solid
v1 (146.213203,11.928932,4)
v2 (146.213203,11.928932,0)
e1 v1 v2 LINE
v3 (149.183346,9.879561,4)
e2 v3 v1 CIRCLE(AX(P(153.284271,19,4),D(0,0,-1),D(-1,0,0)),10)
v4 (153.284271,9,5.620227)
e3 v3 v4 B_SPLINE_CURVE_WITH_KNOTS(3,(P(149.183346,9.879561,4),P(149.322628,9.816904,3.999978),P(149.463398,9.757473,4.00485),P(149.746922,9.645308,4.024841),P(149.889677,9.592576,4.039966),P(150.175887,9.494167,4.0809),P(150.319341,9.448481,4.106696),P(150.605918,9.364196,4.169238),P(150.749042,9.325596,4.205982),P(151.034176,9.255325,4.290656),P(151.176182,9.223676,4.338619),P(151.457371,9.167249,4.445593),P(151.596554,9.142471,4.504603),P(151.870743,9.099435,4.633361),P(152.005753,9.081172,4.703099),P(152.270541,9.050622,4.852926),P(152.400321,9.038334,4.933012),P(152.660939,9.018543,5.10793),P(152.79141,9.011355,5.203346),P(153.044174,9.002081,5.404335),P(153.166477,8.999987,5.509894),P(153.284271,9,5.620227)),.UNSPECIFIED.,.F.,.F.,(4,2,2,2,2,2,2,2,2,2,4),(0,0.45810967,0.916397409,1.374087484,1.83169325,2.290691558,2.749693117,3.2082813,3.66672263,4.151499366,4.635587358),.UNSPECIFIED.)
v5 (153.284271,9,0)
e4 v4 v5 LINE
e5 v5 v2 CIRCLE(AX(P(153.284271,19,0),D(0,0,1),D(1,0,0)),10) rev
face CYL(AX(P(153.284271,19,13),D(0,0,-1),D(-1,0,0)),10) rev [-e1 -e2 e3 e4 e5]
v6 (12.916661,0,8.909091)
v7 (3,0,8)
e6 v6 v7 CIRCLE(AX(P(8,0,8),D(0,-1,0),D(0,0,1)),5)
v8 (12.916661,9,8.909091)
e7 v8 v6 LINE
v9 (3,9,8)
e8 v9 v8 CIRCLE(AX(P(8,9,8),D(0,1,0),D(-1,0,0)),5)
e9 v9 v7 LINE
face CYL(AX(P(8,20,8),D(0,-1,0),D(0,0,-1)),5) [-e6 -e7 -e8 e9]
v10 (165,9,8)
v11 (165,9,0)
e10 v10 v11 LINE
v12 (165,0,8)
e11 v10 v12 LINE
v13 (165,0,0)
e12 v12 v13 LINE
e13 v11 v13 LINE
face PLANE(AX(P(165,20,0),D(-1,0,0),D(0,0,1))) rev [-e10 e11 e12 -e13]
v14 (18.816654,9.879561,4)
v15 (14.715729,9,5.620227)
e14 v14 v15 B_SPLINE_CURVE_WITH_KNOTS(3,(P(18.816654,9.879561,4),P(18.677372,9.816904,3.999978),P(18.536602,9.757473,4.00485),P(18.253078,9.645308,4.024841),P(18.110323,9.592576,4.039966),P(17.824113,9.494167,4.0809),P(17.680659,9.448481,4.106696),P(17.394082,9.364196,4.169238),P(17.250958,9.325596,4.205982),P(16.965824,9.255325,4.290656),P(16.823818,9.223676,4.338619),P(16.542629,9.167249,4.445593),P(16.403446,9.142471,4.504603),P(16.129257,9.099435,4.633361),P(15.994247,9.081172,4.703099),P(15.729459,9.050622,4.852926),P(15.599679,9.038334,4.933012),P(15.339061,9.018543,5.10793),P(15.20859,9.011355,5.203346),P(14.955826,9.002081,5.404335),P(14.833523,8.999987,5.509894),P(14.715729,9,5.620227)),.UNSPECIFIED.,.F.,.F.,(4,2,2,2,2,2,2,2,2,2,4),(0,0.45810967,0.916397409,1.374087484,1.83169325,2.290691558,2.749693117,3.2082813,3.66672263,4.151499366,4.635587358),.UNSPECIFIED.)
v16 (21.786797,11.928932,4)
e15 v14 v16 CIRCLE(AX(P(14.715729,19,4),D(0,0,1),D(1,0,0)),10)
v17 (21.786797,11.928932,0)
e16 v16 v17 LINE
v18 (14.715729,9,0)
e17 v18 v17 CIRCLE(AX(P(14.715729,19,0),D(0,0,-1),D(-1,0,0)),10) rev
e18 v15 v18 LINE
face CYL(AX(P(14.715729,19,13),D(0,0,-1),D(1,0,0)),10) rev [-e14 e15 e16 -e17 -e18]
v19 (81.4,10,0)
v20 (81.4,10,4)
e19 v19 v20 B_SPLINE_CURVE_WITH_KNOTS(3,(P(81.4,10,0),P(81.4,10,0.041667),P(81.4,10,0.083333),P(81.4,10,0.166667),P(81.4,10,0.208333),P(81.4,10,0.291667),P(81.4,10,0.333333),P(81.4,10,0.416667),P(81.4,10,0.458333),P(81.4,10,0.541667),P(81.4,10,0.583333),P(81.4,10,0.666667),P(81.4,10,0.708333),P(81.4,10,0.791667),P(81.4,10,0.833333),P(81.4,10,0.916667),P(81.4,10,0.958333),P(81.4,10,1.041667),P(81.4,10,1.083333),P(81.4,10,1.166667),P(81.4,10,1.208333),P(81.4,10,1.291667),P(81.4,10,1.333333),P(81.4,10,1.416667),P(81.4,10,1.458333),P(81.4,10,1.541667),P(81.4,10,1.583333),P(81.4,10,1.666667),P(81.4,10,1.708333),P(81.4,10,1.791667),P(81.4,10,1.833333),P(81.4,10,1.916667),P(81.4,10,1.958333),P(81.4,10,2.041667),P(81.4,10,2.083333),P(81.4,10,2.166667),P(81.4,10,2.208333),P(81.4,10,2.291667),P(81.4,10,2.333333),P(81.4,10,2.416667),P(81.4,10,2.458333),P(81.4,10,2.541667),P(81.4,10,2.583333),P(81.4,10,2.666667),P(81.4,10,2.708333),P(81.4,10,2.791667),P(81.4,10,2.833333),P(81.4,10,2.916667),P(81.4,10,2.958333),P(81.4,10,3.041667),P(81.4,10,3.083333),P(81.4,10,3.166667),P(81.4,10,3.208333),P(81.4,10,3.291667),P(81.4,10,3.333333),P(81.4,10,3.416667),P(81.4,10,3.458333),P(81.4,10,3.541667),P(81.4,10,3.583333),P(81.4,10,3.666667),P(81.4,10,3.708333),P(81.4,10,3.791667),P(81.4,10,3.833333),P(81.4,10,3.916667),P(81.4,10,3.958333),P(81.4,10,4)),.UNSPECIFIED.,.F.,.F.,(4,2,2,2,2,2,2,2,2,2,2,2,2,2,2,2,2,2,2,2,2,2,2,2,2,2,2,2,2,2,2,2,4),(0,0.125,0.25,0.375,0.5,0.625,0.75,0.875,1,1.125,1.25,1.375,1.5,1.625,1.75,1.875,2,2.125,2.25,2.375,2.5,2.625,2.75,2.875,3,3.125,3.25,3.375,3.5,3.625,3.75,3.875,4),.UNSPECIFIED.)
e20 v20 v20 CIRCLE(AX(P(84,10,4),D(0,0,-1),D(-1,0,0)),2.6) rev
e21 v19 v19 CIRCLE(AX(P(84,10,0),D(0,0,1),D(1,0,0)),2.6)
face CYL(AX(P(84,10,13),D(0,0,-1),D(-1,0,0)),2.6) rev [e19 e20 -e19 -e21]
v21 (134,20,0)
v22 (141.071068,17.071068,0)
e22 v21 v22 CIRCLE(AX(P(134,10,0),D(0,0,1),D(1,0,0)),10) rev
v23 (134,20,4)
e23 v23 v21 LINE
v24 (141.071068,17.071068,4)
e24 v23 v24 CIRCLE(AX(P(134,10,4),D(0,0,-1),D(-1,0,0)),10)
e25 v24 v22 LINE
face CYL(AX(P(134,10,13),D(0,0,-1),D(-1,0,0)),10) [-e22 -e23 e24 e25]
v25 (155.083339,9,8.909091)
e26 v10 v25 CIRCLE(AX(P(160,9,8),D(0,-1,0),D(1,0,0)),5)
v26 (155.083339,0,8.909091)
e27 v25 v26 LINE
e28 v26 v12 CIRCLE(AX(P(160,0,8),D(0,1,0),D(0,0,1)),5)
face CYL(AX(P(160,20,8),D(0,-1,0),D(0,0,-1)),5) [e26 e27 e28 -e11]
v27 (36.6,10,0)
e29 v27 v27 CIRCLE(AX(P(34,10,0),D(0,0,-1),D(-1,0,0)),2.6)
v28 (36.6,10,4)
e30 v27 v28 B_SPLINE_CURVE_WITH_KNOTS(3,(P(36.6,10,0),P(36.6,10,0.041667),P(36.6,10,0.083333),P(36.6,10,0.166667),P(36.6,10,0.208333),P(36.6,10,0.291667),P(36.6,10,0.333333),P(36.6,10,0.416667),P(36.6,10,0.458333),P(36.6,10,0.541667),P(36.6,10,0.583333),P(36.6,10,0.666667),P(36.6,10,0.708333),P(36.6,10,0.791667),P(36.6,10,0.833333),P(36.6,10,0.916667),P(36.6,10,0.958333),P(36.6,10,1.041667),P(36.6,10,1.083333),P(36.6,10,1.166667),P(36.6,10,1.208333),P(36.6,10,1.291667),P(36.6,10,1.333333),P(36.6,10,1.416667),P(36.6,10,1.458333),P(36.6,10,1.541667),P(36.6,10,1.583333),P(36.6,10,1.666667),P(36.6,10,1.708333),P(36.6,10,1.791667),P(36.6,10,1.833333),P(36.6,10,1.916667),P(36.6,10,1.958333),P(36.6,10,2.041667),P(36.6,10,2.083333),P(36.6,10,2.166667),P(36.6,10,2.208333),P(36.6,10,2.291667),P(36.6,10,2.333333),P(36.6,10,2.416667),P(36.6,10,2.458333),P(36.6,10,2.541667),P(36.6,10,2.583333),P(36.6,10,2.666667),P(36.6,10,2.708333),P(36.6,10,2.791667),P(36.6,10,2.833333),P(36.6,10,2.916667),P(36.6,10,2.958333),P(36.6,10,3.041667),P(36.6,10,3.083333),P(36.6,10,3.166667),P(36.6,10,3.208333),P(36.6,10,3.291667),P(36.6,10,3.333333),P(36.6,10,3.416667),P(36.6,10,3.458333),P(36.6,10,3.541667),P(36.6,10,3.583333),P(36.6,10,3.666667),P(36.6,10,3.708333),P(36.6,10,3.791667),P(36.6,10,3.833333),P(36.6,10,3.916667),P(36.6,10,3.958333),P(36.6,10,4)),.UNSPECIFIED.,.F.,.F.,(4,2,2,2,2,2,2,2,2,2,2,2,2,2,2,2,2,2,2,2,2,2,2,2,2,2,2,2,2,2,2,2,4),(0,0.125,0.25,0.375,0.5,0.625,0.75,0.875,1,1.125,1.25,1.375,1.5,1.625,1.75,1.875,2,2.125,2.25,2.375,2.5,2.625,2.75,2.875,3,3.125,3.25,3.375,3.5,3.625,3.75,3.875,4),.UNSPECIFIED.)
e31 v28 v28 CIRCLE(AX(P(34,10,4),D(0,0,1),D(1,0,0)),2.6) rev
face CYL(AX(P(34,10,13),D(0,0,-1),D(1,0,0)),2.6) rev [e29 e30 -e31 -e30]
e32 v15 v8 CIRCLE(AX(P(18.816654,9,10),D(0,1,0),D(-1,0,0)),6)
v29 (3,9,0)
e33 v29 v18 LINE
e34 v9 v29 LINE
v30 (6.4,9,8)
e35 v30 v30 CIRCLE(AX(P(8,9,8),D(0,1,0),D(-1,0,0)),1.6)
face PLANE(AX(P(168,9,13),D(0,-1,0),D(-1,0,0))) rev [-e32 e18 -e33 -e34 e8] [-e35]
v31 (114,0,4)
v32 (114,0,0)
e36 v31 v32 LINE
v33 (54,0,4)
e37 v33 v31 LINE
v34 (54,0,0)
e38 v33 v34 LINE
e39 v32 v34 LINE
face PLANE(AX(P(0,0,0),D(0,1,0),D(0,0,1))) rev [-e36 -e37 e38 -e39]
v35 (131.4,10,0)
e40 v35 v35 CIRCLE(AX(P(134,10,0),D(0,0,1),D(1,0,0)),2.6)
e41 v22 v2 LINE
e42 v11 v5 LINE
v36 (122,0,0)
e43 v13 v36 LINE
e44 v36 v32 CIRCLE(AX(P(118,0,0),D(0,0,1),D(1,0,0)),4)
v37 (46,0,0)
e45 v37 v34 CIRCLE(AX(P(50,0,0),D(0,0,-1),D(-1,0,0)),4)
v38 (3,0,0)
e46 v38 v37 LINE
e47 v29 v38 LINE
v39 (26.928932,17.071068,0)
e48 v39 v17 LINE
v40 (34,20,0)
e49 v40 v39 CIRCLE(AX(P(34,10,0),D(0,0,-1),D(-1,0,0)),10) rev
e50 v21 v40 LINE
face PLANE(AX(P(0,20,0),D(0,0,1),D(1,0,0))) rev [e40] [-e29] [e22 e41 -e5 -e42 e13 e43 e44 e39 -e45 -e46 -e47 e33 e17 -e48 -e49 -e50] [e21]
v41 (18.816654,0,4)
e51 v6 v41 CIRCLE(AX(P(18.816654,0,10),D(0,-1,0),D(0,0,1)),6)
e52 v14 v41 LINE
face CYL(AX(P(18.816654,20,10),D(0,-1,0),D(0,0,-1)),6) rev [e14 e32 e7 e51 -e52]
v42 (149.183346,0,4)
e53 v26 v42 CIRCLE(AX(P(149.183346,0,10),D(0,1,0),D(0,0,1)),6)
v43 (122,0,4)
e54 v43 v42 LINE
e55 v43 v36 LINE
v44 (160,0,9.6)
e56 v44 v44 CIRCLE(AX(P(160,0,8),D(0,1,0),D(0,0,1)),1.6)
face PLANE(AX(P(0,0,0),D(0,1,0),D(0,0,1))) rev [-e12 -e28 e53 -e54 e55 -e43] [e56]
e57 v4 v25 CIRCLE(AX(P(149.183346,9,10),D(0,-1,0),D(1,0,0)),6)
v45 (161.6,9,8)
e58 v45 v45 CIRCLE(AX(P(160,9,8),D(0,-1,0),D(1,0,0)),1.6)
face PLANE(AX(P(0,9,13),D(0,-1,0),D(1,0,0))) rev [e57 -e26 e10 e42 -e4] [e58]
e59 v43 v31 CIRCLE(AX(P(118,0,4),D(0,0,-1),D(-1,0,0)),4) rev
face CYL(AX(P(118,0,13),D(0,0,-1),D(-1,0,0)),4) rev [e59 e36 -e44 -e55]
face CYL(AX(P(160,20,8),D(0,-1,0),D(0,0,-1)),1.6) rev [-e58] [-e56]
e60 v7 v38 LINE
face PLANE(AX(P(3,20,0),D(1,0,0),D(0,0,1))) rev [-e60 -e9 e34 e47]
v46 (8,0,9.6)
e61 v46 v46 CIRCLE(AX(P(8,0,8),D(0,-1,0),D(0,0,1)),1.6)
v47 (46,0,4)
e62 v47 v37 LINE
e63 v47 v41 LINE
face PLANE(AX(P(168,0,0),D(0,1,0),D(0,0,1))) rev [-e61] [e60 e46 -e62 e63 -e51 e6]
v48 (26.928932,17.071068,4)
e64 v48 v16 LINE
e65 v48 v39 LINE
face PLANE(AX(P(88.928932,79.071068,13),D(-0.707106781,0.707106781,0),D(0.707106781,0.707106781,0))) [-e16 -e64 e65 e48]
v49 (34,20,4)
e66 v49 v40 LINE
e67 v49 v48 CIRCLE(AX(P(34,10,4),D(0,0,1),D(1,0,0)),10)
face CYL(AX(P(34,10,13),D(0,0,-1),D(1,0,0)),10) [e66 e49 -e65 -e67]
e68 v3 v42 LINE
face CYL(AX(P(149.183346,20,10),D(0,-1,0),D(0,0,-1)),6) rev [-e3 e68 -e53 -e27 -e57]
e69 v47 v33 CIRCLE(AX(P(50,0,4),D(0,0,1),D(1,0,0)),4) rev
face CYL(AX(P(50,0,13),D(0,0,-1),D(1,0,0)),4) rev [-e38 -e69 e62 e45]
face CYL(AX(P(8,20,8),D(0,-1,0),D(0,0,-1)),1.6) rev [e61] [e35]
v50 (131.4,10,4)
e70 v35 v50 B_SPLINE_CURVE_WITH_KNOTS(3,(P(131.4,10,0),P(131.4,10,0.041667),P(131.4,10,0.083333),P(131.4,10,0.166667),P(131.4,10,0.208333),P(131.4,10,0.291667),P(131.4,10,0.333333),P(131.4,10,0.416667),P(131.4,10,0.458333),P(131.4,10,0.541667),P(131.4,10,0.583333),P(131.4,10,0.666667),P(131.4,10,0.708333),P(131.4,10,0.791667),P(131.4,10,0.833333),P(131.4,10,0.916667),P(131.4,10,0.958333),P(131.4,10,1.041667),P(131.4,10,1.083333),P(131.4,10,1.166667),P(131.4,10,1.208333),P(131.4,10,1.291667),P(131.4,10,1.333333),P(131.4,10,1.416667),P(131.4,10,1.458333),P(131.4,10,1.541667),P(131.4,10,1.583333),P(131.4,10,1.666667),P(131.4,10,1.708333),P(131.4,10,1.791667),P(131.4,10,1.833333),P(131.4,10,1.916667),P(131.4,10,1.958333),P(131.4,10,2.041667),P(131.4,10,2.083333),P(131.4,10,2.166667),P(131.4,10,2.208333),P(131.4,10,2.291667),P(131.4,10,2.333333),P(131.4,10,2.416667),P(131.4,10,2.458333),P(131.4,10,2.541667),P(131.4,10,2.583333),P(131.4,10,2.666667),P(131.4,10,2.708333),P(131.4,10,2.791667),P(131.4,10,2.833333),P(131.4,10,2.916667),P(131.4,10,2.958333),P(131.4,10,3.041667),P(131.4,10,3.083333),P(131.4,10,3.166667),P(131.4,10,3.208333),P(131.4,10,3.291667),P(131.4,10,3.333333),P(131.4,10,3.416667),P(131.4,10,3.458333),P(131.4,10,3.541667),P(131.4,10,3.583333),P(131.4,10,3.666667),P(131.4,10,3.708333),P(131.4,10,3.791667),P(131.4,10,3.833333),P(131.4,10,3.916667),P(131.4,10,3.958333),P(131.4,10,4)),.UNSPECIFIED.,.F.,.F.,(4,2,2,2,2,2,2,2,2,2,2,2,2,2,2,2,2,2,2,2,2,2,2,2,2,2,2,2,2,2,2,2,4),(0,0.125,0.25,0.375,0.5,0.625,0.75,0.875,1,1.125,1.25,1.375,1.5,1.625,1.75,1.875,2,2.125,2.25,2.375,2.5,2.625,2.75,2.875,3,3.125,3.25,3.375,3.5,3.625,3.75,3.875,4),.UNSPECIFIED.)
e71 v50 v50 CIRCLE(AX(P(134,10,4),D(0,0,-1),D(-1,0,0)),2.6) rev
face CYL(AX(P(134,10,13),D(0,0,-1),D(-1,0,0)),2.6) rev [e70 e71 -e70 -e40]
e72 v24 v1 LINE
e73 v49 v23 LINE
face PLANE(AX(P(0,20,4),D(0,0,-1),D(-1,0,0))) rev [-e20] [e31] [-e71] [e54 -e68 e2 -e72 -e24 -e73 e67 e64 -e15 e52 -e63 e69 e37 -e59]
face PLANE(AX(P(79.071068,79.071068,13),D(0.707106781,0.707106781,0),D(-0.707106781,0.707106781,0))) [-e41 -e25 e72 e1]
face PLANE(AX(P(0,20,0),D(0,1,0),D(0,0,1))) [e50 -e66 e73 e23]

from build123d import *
from build123d.topology import SkipClean

# Parameters (mm, degrees)
SKETCH1_R           = 1.6
BOSS_EXTRUDE1_DEPTH = 20
SKETCH3_R           = 2.6
BOSS_EXTRUDE2_DEPTH = 13


with BuildPart() as part:
    # Sketch1 → Boss-Extrude1 (new body)
    with BuildSketch(Plane(origin=(0, 0, 0), x_dir=(1, 0, 0), z_dir=(0, 1, 0))):
        with BuildLine():
            Line((165, -8), (165, 0))
            Line((165, 0), (84, 0))
            Line((84, 0), (84, -4))
            Line((84, -4), (149.183346174, -4))
            ThreePointArc((149.183346174, -4), (153.020959068, -5.387763311), (155.08333917, -8.909090909))
            ThreePointArc((155.08333917, -8.909090909), (160.456451448, -12.979121617), (165, -8))
        make_face()
        with Locations(Location((160, -8, 0), (0, 0, 270))):
            Circle(SKETCH1_R, mode=Mode.SUBTRACT)
    extrude(amount=BOSS_EXTRUDE1_DEPTH)


with BuildPart() as body_2:
    # Sketch3 → Boss-Extrude2 (new, through all)
    with BuildSketch(Plane.XY):
        with BuildLine():
            Line((122, 0), (165, 0))
            Line((165, 0), (165, 9))
            Line((165, 9), (153.284271247, 9))
            ThreePointArc((153.284271247, 9), (149.457436924, 9.761204675), (146.213203436, 11.928932188))
            Line((146.213203436, 11.928932188), (141.071067812, 17.071067812))
            ThreePointArc((141.071067812, 17.071067812), (137.826834324, 19.238795325), (134, 20))
            Line((134, 20), (84, 20))
            Line((84, 20), (84, 12.6))
            ThreePointArc((84, 12.6), (85.838477631, 11.838477631), (86.6, 10))
            ThreePointArc((86.6, 10), (85.838477631, 8.161522369), (84, 7.4))
            Line((84, 7.4), (84, 0))
            Line((84, 0), (114, 0))
            ThreePointArc((114, 0), (118, 4), (122, 0))
        make_face()
        with Locations(Location((134, 10, 0), (0, 0, 180))):
            Circle(SKETCH3_R, mode=Mode.SUBTRACT)
    extrude(amount=BOSS_EXTRUDE2_DEPTH)

    # Intersect1: read off the stored shape, not the designer's step
    # Intersect1: intersect part
    add(part.part, mode=Mode.INTERSECT)

    # Mirror1: body 2 across face


with BuildPart() as body_2_1:
    with SkipClean():  # the faces are left unmerged after this step: merging them gives an invalid solid
        add(body_2.part)
        add(body_2.part.mirror(Plane(origin=(84, 16.3, 2), x_dir=(0, 0, 1), z_dir=(-1, 0, 0))))


solid = body_2_1.part
